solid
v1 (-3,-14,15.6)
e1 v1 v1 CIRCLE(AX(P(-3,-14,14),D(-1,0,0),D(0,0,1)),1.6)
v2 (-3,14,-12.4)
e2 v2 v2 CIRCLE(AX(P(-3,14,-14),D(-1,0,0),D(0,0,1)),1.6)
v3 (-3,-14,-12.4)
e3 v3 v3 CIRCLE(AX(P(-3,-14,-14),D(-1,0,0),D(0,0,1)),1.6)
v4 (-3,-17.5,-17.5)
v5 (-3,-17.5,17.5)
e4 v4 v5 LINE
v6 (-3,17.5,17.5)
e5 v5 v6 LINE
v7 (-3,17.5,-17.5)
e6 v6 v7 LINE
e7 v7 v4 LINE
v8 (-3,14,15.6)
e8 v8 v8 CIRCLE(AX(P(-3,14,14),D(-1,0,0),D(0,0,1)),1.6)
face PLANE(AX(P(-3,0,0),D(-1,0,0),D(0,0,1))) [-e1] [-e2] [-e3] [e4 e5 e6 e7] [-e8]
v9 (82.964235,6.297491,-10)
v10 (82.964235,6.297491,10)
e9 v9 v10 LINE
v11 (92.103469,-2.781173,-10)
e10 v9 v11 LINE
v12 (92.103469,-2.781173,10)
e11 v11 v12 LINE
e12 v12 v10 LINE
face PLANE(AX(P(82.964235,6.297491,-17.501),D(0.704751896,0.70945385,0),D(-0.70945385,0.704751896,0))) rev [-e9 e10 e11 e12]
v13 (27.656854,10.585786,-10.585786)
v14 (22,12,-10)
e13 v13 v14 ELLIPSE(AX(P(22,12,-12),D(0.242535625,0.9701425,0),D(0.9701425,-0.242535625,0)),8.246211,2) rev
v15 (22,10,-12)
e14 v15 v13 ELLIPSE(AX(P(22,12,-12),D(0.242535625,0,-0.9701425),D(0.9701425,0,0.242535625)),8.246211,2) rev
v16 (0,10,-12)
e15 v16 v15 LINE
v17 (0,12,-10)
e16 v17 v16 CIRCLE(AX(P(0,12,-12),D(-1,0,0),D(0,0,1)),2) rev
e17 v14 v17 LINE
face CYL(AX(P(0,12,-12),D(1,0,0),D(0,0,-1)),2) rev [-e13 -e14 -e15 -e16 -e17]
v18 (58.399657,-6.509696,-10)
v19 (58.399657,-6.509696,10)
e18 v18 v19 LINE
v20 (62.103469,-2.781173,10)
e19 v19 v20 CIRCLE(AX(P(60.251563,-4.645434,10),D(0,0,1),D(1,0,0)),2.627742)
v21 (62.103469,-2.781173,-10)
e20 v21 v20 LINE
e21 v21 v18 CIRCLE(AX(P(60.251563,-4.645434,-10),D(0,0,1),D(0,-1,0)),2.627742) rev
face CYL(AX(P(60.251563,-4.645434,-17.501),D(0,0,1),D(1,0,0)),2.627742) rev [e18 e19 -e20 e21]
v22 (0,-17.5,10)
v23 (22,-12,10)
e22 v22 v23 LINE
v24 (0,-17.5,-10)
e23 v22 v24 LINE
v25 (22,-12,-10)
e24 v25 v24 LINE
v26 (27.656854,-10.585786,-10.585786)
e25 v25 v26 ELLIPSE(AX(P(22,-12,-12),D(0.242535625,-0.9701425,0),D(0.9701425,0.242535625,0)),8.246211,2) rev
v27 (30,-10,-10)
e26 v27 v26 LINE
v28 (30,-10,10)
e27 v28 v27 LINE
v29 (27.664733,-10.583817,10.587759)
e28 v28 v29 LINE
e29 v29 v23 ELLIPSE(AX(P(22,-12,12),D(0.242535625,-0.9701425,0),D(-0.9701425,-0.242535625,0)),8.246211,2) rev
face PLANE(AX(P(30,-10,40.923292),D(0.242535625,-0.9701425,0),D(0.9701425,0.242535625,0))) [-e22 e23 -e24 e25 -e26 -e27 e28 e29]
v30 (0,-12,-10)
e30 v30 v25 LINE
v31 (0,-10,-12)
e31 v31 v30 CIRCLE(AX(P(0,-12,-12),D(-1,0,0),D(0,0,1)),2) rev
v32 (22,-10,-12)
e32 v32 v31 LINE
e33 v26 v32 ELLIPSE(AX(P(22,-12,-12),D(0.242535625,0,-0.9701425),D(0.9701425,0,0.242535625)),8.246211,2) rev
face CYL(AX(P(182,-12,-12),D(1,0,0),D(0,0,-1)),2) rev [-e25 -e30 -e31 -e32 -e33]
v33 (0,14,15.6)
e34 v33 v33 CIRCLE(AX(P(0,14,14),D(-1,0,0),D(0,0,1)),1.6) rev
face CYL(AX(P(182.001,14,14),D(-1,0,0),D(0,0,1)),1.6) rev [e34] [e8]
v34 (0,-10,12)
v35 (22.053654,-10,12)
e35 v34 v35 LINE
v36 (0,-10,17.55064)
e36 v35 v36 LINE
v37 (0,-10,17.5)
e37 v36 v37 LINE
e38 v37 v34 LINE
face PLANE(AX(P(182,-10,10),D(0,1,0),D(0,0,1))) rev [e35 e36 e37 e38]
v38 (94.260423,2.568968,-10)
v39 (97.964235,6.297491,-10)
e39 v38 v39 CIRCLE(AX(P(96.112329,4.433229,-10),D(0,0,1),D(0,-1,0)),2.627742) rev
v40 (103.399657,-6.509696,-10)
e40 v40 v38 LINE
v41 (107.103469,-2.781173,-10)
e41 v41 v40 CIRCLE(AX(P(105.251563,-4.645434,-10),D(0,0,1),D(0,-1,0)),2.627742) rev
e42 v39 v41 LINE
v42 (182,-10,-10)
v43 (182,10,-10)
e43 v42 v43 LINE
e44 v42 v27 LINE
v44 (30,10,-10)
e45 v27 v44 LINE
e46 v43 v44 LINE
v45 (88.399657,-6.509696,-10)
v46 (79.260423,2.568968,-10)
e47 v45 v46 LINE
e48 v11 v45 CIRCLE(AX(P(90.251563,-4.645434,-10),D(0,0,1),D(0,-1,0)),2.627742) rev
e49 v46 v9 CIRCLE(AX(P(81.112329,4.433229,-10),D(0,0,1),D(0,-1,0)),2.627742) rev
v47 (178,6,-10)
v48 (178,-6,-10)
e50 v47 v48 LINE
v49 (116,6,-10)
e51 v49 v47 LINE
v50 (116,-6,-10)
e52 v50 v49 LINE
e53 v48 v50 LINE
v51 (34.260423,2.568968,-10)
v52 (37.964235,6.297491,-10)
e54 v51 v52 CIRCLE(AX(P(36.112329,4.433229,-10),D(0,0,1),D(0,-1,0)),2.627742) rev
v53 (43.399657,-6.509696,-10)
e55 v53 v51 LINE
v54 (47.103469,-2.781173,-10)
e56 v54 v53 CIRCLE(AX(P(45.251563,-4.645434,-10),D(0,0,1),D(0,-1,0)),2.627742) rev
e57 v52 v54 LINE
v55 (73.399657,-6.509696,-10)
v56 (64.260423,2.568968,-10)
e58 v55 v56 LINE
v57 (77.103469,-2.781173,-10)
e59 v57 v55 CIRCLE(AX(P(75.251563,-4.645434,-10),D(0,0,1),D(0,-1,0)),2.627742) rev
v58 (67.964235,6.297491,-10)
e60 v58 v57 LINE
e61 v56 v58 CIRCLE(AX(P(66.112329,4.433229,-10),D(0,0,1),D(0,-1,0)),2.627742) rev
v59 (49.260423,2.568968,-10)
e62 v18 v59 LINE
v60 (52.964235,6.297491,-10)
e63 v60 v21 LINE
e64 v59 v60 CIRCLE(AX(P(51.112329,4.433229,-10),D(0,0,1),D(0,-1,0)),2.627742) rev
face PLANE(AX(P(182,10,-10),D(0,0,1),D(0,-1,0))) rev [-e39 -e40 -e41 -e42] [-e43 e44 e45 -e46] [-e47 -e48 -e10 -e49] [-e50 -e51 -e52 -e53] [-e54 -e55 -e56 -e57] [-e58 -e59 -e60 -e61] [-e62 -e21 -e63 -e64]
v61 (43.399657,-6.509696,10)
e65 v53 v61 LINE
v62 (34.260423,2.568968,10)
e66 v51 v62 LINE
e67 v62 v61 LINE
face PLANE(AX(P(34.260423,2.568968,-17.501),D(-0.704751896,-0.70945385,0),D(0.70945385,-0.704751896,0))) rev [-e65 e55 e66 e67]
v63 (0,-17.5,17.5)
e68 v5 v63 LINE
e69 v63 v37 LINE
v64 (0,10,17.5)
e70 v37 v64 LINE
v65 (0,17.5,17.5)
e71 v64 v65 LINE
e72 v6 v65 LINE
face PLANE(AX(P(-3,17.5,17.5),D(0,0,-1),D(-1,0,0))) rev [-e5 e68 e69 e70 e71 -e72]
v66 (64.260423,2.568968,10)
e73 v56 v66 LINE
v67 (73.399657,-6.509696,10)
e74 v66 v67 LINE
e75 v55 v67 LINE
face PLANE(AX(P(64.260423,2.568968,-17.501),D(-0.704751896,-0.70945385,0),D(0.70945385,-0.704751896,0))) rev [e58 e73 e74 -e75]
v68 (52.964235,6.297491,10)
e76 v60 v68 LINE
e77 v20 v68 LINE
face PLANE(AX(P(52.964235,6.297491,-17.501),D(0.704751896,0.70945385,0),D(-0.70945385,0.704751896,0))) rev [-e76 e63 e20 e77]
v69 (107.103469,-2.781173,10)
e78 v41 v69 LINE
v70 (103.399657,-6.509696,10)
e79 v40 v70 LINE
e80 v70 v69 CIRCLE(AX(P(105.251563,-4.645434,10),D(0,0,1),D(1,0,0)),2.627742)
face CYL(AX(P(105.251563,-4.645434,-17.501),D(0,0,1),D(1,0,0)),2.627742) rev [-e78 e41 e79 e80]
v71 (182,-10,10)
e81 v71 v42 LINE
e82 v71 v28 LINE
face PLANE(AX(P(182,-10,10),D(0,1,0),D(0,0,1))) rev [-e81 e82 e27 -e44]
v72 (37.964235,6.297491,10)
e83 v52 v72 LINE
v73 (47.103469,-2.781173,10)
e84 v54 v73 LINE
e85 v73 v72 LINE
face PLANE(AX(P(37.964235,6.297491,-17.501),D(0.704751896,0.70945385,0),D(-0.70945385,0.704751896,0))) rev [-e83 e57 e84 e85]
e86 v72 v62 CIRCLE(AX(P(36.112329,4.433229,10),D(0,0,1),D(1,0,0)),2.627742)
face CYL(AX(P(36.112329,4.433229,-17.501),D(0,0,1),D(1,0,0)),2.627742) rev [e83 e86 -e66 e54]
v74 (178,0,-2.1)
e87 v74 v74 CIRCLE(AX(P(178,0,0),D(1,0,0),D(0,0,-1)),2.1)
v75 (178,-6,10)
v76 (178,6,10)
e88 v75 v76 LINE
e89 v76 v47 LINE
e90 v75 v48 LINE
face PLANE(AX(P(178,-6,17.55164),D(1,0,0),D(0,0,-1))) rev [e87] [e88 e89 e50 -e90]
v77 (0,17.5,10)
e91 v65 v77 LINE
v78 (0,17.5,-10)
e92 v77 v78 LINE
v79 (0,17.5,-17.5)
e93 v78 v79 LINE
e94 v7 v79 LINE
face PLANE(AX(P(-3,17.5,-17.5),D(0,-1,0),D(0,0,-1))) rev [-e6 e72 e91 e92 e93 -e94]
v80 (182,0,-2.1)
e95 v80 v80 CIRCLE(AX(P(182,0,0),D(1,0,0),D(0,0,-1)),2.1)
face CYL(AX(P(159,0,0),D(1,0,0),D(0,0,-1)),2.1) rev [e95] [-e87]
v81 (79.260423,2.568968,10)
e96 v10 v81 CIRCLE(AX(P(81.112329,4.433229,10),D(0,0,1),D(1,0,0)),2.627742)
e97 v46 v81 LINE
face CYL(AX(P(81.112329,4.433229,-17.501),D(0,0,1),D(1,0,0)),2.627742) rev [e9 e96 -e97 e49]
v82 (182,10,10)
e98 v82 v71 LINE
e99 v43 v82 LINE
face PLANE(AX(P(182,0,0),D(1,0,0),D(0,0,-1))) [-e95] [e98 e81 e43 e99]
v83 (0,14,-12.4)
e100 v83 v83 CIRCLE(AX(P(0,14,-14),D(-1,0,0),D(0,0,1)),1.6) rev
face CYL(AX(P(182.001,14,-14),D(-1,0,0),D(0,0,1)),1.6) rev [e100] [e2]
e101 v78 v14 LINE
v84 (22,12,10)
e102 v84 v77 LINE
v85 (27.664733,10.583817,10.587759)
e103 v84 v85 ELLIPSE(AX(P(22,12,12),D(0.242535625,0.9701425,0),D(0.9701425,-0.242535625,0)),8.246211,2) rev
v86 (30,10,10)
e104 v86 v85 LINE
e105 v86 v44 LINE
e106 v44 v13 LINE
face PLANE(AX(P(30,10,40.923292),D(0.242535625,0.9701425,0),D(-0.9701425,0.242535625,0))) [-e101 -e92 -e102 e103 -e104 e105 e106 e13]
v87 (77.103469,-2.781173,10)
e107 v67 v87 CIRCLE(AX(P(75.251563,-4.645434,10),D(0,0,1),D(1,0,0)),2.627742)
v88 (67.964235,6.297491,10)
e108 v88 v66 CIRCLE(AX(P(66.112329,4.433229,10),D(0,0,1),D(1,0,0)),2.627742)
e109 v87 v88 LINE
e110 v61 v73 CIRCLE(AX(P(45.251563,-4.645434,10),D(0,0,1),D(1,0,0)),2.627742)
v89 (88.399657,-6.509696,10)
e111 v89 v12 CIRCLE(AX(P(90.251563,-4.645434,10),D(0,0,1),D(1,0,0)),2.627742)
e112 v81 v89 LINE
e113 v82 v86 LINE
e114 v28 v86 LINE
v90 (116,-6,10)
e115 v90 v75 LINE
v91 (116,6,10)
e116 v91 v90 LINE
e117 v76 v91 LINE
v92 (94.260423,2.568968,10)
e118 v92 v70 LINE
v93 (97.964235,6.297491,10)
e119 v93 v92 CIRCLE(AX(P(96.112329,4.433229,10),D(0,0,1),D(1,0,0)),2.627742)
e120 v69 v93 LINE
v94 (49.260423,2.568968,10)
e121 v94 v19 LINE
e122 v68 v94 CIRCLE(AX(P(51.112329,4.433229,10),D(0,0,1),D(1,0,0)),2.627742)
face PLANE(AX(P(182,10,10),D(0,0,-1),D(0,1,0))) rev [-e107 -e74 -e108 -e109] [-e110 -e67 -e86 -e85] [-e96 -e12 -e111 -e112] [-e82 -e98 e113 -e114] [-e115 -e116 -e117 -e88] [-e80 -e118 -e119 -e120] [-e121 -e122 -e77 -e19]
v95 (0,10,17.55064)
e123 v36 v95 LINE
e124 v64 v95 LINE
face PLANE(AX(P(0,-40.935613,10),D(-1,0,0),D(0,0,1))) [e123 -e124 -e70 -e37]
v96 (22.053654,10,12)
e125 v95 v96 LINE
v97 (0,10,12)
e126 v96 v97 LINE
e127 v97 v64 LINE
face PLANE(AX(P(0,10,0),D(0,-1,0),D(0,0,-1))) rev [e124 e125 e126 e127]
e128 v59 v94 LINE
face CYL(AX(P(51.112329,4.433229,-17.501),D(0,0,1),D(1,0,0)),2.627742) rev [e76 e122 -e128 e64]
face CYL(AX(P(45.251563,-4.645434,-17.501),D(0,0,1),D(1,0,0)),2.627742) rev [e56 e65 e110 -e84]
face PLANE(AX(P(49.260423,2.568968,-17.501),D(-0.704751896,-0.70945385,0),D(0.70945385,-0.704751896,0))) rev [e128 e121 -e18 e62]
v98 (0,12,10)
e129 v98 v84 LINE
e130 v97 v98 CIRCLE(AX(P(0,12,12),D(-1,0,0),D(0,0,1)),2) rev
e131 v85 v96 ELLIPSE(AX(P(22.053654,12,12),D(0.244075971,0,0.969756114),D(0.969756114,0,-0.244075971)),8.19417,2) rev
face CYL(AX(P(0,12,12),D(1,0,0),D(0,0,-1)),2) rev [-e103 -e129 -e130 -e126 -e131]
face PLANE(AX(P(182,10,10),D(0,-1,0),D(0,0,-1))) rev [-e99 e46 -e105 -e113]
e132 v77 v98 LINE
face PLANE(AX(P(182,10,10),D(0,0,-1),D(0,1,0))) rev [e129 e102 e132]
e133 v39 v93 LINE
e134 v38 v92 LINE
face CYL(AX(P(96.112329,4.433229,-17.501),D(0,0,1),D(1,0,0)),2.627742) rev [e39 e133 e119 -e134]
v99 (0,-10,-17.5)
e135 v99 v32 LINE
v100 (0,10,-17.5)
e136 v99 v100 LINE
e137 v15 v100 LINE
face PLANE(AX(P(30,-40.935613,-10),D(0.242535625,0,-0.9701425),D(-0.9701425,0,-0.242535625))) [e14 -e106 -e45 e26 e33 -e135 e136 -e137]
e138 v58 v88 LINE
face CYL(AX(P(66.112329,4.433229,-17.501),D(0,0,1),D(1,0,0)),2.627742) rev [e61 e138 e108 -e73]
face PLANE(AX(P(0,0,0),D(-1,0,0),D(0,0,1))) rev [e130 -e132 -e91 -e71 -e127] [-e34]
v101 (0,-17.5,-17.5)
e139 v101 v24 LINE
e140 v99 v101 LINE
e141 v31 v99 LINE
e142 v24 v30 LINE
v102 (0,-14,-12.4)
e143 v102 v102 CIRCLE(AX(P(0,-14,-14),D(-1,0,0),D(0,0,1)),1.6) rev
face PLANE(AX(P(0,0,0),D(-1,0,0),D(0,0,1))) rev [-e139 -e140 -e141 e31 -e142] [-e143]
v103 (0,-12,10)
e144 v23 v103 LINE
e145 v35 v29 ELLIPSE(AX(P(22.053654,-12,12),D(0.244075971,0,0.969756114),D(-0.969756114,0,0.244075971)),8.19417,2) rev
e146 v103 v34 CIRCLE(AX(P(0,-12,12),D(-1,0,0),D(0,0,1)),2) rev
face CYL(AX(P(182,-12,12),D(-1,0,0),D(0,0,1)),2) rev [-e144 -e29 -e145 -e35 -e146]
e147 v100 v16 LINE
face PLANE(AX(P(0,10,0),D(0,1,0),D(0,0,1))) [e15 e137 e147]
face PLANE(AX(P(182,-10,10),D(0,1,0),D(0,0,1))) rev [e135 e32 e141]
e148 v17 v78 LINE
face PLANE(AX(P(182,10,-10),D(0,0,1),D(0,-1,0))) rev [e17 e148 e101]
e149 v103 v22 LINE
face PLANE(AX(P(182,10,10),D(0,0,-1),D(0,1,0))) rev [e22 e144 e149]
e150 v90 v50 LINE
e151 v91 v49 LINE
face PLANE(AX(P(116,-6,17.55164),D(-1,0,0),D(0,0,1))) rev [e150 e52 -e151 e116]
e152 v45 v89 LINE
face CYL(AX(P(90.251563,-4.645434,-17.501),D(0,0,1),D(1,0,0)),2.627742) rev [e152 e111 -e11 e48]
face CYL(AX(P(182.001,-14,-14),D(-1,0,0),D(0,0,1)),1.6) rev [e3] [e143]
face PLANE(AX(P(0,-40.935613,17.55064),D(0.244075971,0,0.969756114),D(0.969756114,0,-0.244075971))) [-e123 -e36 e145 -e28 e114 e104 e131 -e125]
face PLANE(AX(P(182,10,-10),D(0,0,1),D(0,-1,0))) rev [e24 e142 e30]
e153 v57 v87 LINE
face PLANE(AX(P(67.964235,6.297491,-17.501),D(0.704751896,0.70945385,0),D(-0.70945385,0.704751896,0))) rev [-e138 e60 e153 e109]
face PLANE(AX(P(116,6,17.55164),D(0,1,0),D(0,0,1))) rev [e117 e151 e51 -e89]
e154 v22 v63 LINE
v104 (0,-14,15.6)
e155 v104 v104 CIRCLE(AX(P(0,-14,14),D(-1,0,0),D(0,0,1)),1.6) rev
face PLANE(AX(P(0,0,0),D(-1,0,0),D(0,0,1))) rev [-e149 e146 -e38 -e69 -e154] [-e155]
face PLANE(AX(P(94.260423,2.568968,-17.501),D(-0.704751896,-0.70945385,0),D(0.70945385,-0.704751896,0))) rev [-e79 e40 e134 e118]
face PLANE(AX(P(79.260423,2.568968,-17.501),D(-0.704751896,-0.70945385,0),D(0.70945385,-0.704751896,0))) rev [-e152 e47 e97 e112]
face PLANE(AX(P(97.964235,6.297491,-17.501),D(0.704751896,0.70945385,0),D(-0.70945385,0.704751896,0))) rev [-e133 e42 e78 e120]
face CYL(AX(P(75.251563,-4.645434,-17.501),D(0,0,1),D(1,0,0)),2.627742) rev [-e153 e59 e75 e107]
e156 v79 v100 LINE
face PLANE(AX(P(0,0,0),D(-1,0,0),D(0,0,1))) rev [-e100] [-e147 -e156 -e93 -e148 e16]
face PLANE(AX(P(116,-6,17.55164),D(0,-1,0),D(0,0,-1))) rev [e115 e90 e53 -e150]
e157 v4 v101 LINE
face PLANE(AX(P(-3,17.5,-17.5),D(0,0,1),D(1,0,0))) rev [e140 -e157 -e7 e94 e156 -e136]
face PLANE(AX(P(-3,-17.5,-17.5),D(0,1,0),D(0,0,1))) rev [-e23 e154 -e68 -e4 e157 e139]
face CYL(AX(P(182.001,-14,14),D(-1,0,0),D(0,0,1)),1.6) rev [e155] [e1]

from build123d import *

# Parameters (mm, degrees)
SKETCH_1_W          = 20
SKETCH_1_H          = 20
EXTRUDE_1_DEPTH     = 182
SKETCH_3_W          = 35
SKETCH_3_H          = 35
EXTRUDE_2_DEPTH     = 3
SKETCH_4_R          = 2.1
CUT_EXTRUDE_2_DEPTH = 23
CUT_EXTRUDE_3_REACH = 188.648
SKETCH_5_R          = 1.6
EXTRUDE_3_DEPTH     = 20
EXTRUDE_4_DEPTH     = 20
FILLET_1_R          = 2
CUT_EXTRUDE_4_REACH = 186.903
SKETCH_8_W          = 62
SKETCH_8_H          = 12
CUT_EXTRUDE_6_REACH = 186.896


with BuildPart() as part:
    # 草图1 → 凸台-拉伸1 (new body)
    with BuildSketch(Plane(origin=(0, 0, 0), x_dir=(0, 0, -1), z_dir=(1, 0, 0))):
        Rectangle(SKETCH_1_W, SKETCH_1_H)
    extrude(amount=EXTRUDE_1_DEPTH)

    # 草图3 → 凸台-拉伸2 (add)
    with BuildSketch(Plane.ZY):
        Rectangle(SKETCH_3_W, SKETCH_3_H)
    extrude(amount=EXTRUDE_2_DEPTH)

    # 草图4 → 切除-拉伸2 (cut)
    with BuildSketch(Plane(origin=(182, 0, 0), x_dir=(0, 0, -1), z_dir=(1, 0, 0))):
        Circle(SKETCH_4_R)
    extrude(amount=-CUT_EXTRUDE_2_DEPTH, mode=Mode.SUBTRACT)

    # 草图5 → 切除-拉伸3 (cut, up to next)
    with BuildSketch(Plane.ZY.offset(3), mode=Mode.PRIVATE) as cut_extrude_3_sk1:
        with Locations((-14, 14)):
            Circle(SKETCH_5_R)
    cut_extrude_3_tool1 = extrude(cut_extrude_3_sk1.sketch, amount=-CUT_EXTRUDE_3_REACH, mode=Mode.PRIVATE) & part.part
    # 草图5 → 切除-拉伸3 (cut, up to next)
    with BuildSketch(Plane.ZY.offset(3), mode=Mode.PRIVATE) as cut_extrude_3_sk2:
        with Locations((14, 14)):
            Circle(SKETCH_5_R)
    cut_extrude_3_tool2 = extrude(cut_extrude_3_sk2.sketch, amount=-CUT_EXTRUDE_3_REACH, mode=Mode.PRIVATE) & part.part
    # 草图5 → 切除-拉伸3 (cut, up to next)
    with BuildSketch(Plane.ZY.offset(3), mode=Mode.PRIVATE) as cut_extrude_3_sk3:
        with Locations((-14, -14)):
            Circle(SKETCH_5_R)
    cut_extrude_3_tool3 = extrude(cut_extrude_3_sk3.sketch, amount=-CUT_EXTRUDE_3_REACH, mode=Mode.PRIVATE) & part.part
    # 草图5 → 切除-拉伸3 (cut, up to next)
    with BuildSketch(Plane.ZY.offset(3), mode=Mode.PRIVATE) as cut_extrude_3_sk4:
        with Locations((14, -14)):
            Circle(SKETCH_5_R)
    cut_extrude_3_tool4 = extrude(cut_extrude_3_sk4.sketch, amount=-CUT_EXTRUDE_3_REACH, mode=Mode.PRIVATE) & part.part
    add(cut_extrude_3_tool1.solids().sort_by_distance((-3, 14, -14))[0], mode=Mode.SUBTRACT)
    add(cut_extrude_3_tool2.solids().sort_by_distance((-3, 14, 14))[0], mode=Mode.SUBTRACT)
    add(cut_extrude_3_tool3.solids().sort_by_distance((-3, -14, -14))[0], mode=Mode.SUBTRACT)
    add(cut_extrude_3_tool4.solids().sort_by_distance((-3, -14, 14))[0], mode=Mode.SUBTRACT)

    # 草图6 → 凸台-拉伸3 (add)
    with BuildSketch(Plane(origin=(0, 0, -10), x_dir=(-1, 0, 0), z_dir=(0, 0, -1))):
        Polygon((-30, 10), (0, 17.5), (0, 10), align=None)
        Polygon((0, -10), (-30, -10), (0, -17.5), align=None)
    extrude(amount=-EXTRUDE_3_DEPTH)

    # 草图7 → 凸台-拉伸4 (add)
    with BuildSketch(Plane(origin=(0, 10, 0), x_dir=(1, 0, 0), z_dir=(0, 1, 0))):
        Polygon((0, 10), (30, 10), (0, 17.5), align=None)
        Polygon((30, -10), (0, -10), (0, -17.550639808), align=None)
    extrude(amount=-EXTRUDE_4_DEPTH)

    # 圆角1
    # the kernel refuses this fillet: 2 mm, written as the material it adds along each edge
    with BuildSketch(Plane(origin=(-5, 10, -10), x_dir=(0, 0, -1), z_dir=(1, 0, 0))) as fillet_1_piece_1_section:
        with BuildLine():
            CenterArc((FILLET_1_R, FILLET_1_R), FILLET_1_R, 180, 90)
            Line((0, FILLET_1_R), (0, 0))
            Line((0, 0), (FILLET_1_R, 0))
        make_face()
    fillet_1_piece_1 = extrude(amount=40, mode=Mode.PRIVATE)
    fillet_1_piece_1 = split(fillet_1_piece_1, bisect_by=Plane(origin=(14.470095562, 13.882476109, -10.438694278), z_dir=(-0.24253562503633314, -0.9701425001453319, 0)), keep=Keep.TOP, mode=Mode.PRIVATE)
    fillet_1_piece_1 = split(fillet_1_piece_1, bisect_by=Plane(origin=(-3, 10.438694278, -10.438694278), z_dir=(1, 0, 0)), keep=Keep.TOP, mode=Mode.PRIVATE)
    fillet_1_piece_1 = split(fillet_1_piece_1, bisect_by=Plane(origin=(14.470095562, 10.438694278, -13.882476109), z_dir=(-0.24253562503633308, 0, 0.9701425001453319)), keep=Keep.TOP, mode=Mode.PRIVATE)
    add(fillet_1_piece_1)
    with BuildSketch(Plane(origin=(0, -10, -10), x_dir=(0, -1, 0), z_dir=(1, 0, 0))) as fillet_1_piece_2_section:
        with BuildLine():
            CenterArc((FILLET_1_R, FILLET_1_R), FILLET_1_R, 180, 90)
            Line((0, FILLET_1_R), (0, 0))
            Line((0, 0), (FILLET_1_R, 0))
        make_face()
    fillet_1_piece_2 = extrude(amount=35, mode=Mode.PRIVATE)
    fillet_1_piece_2 = split(fillet_1_piece_2, bisect_by=Plane(origin=(14.470095562, -10.438694278, -13.882476109), z_dir=(-0.24253562503633308, 0, 0.9701425001453319)), keep=Keep.TOP, mode=Mode.PRIVATE)
    fillet_1_piece_2 = split(fillet_1_piece_2, bisect_by=Plane(origin=(14.470095562, -13.882476109, -10.438694278), z_dir=(-0.24253562503633314, 0.9701425001453319, 0)), keep=Keep.TOP, mode=Mode.PRIVATE)
    add(fillet_1_piece_2)
    with BuildSketch(Plane(origin=(35, 10, 10), x_dir=(0, 1, 0), z_dir=(-1, 0, 0))) as fillet_1_piece_3_section:
        with BuildLine():
            CenterArc((FILLET_1_R, -FILLET_1_R), FILLET_1_R, 90, 90)
            Line((0, -FILLET_1_R), (0, 0))
            Line((0, 0), (FILLET_1_R, 0))
        make_face()
    fillet_1_piece_3 = extrude(amount=40, mode=Mode.PRIVATE)
    fillet_1_piece_3 = split(fillet_1_piece_3, bisect_by=Plane(origin=(14.474382617, 13.881404346, 10.438850692), z_dir=(-0.24253562503633314, -0.9701425001453319, 0)), keep=Keep.TOP, mode=Mode.PRIVATE)
    fillet_1_piece_3 = split(fillet_1_piece_3, bisect_by=Plane(origin=(-3, 10.438597443, 10.438850692), z_dir=(1, 0, 0)), keep=Keep.TOP, mode=Mode.PRIVATE)
    fillet_1_piece_3 = split(fillet_1_piece_3, bisect_by=Plane(origin=(14.485990983, 10.438597443, 13.904689802), z_dir=(-0.24407597060240918, 0, -0.969756113966028)), keep=Keep.TOP, mode=Mode.PRIVATE)
    add(fillet_1_piece_3)
    with BuildSketch(Plane(origin=(35, -10, 10), x_dir=(0, 0, 1), z_dir=(-1, 0, 0))) as fillet_1_piece_4_section:
        with BuildLine():
            CenterArc((FILLET_1_R, -FILLET_1_R), FILLET_1_R, 90, 90)
            Line((0, -FILLET_1_R), (0, 0))
            Line((0, 0), (FILLET_1_R, 0))
        make_face()
    fillet_1_piece_4 = extrude(amount=35, mode=Mode.PRIVATE)
    fillet_1_piece_4 = split(fillet_1_piece_4, bisect_by=Plane(origin=(14.474382617, -13.881404346, 10.438850692), z_dir=(-0.24253562503633314, 0.9701425001453319, 0)), keep=Keep.TOP, mode=Mode.PRIVATE)
    fillet_1_piece_4 = split(fillet_1_piece_4, bisect_by=Plane(origin=(14.485990983, -10.438597443, 13.904689802), z_dir=(-0.24407597060240918, 0, -0.969756113966028)), keep=Keep.TOP, mode=Mode.PRIVATE)
    add(fillet_1_piece_4)

    # 草图8 → 切除-拉伸4 (cut, up to next)
    with BuildSketch(Plane(origin=(0, 0, -10), x_dir=(-1, 0, 0), z_dir=(0, 0, -1)), mode=Mode.PRIVATE) as cut_extrude_4_sk1:
        with Locations((-147, 0)):
            Rectangle(SKETCH_8_W, SKETCH_8_H)
    cut_extrude_4_tool1 = extrude(cut_extrude_4_sk1.sketch, amount=-CUT_EXTRUDE_4_REACH, mode=Mode.PRIVATE) & part.part
    add(cut_extrude_4_tool1.solids().sort_by_distance((147, 0, -10))[0], mode=Mode.SUBTRACT)

    # 草图9 → 切除-拉伸6 (cut, up to next)
    with BuildSketch(Plane.XY.offset(10), mode=Mode.PRIVATE) as cut_extrude_6_sk1:
        with BuildLine():
            Line((97.964235065, 6.297490727), (107.103469291, -2.781172596))
            ThreePointArc((107.103469291, -2.781172596), (107.115824812, -6.497340056), (103.399657352, -6.509695577))
            Line((103.399657352, -6.509695577), (94.260423126, 2.568967746))
            ThreePointArc((94.260423126, 2.568967746), (94.248067605, 6.285135206), (97.964235065, 6.297490727))
        make_face()
    cut_extrude_6_tool1 = extrude(cut_extrude_6_sk1.sketch, amount=-CUT_EXTRUDE_6_REACH, mode=Mode.PRIVATE) & part.part
    # 草图9 → 切除-拉伸6 (cut, up to next)
    with BuildSketch(Plane.XY.offset(10), mode=Mode.PRIVATE) as cut_extrude_6_sk2:
        with BuildLine():
            Line((82.964235065, 6.297490727), (92.103469291, -2.781172596))
            ThreePointArc((92.103469291, -2.781172596), (92.115824812, -6.497340056), (88.399657352, -6.509695577))
            Line((88.399657352, -6.509695577), (79.260423126, 2.568967746))
            ThreePointArc((79.260423126, 2.568967746), (79.248067605, 6.285135206), (82.964235065, 6.297490727))
        make_face()
    cut_extrude_6_tool2 = extrude(cut_extrude_6_sk2.sketch, amount=-CUT_EXTRUDE_6_REACH, mode=Mode.PRIVATE) & part.part
    # 草图9 → 切除-拉伸6 (cut, up to next)
    with BuildSketch(Plane.XY.offset(10), mode=Mode.PRIVATE) as cut_extrude_6_sk3:
        with BuildLine():
            Line((67.964235065, 6.297490727), (77.103469291, -2.781172596))
            ThreePointArc((77.103469291, -2.781172596), (77.115824812, -6.497340056), (73.399657352, -6.509695577))
            Line((73.399657352, -6.509695577), (64.260423126, 2.568967746))
            ThreePointArc((64.260423126, 2.568967746), (64.248067605, 6.285135206), (67.964235065, 6.297490727))
        make_face()
    cut_extrude_6_tool3 = extrude(cut_extrude_6_sk3.sketch, amount=-CUT_EXTRUDE_6_REACH, mode=Mode.PRIVATE) & part.part
    # 草图9 → 切除-拉伸6 (cut, up to next)
    with BuildSketch(Plane.XY.offset(10), mode=Mode.PRIVATE) as cut_extrude_6_sk4:
        with BuildLine():
            Line((52.964235065, 6.297490727), (62.103469291, -2.781172596))
            ThreePointArc((62.103469291, -2.781172596), (62.115824812, -6.497340056), (58.399657352, -6.509695577))
            Line((58.399657352, -6.509695577), (49.260423126, 2.568967746))
            ThreePointArc((49.260423126, 2.568967746), (49.248067605, 6.285135206), (52.964235065, 6.297490727))
        make_face()
    cut_extrude_6_tool4 = extrude(cut_extrude_6_sk4.sketch, amount=-CUT_EXTRUDE_6_REACH, mode=Mode.PRIVATE) & part.part
    # 草图9 → 切除-拉伸6 (cut, up to next)
    with BuildSketch(Plane.XY.offset(10), mode=Mode.PRIVATE) as cut_extrude_6_sk5:
        with BuildLine():
            Line((37.964235065, 6.297490727), (47.103469291, -2.781172596))
            ThreePointArc((47.103469291, -2.781172596), (47.115824812, -6.497340056), (43.399657352, -6.509695577))
            Line((43.399657352, -6.509695577), (34.260423126, 2.568967746))
            ThreePointArc((34.260423126, 2.568967746), (34.248067605, 6.285135206), (37.964235065, 6.297490727))
        make_face()
    cut_extrude_6_tool5 = extrude(cut_extrude_6_sk5.sketch, amount=-CUT_EXTRUDE_6_REACH, mode=Mode.PRIVATE) & part.part
    add(cut_extrude_6_tool1.solids().sort_by_distance((100.681946, -0.106102, 10))[0], mode=Mode.SUBTRACT)
    add(cut_extrude_6_tool2.solids().sort_by_distance((85.681946, -0.106102, 10))[0], mode=Mode.SUBTRACT)
    add(cut_extrude_6_tool3.solids().sort_by_distance((70.681946, -0.106102, 10))[0], mode=Mode.SUBTRACT)
    add(cut_extrude_6_tool4.solids().sort_by_distance((55.681946, -0.106102, 10))[0], mode=Mode.SUBTRACT)
    add(cut_extrude_6_tool5.solids().sort_by_distance((40.681946, -0.106102, 10))[0], mode=Mode.SUBTRACT)


solid = part.part
